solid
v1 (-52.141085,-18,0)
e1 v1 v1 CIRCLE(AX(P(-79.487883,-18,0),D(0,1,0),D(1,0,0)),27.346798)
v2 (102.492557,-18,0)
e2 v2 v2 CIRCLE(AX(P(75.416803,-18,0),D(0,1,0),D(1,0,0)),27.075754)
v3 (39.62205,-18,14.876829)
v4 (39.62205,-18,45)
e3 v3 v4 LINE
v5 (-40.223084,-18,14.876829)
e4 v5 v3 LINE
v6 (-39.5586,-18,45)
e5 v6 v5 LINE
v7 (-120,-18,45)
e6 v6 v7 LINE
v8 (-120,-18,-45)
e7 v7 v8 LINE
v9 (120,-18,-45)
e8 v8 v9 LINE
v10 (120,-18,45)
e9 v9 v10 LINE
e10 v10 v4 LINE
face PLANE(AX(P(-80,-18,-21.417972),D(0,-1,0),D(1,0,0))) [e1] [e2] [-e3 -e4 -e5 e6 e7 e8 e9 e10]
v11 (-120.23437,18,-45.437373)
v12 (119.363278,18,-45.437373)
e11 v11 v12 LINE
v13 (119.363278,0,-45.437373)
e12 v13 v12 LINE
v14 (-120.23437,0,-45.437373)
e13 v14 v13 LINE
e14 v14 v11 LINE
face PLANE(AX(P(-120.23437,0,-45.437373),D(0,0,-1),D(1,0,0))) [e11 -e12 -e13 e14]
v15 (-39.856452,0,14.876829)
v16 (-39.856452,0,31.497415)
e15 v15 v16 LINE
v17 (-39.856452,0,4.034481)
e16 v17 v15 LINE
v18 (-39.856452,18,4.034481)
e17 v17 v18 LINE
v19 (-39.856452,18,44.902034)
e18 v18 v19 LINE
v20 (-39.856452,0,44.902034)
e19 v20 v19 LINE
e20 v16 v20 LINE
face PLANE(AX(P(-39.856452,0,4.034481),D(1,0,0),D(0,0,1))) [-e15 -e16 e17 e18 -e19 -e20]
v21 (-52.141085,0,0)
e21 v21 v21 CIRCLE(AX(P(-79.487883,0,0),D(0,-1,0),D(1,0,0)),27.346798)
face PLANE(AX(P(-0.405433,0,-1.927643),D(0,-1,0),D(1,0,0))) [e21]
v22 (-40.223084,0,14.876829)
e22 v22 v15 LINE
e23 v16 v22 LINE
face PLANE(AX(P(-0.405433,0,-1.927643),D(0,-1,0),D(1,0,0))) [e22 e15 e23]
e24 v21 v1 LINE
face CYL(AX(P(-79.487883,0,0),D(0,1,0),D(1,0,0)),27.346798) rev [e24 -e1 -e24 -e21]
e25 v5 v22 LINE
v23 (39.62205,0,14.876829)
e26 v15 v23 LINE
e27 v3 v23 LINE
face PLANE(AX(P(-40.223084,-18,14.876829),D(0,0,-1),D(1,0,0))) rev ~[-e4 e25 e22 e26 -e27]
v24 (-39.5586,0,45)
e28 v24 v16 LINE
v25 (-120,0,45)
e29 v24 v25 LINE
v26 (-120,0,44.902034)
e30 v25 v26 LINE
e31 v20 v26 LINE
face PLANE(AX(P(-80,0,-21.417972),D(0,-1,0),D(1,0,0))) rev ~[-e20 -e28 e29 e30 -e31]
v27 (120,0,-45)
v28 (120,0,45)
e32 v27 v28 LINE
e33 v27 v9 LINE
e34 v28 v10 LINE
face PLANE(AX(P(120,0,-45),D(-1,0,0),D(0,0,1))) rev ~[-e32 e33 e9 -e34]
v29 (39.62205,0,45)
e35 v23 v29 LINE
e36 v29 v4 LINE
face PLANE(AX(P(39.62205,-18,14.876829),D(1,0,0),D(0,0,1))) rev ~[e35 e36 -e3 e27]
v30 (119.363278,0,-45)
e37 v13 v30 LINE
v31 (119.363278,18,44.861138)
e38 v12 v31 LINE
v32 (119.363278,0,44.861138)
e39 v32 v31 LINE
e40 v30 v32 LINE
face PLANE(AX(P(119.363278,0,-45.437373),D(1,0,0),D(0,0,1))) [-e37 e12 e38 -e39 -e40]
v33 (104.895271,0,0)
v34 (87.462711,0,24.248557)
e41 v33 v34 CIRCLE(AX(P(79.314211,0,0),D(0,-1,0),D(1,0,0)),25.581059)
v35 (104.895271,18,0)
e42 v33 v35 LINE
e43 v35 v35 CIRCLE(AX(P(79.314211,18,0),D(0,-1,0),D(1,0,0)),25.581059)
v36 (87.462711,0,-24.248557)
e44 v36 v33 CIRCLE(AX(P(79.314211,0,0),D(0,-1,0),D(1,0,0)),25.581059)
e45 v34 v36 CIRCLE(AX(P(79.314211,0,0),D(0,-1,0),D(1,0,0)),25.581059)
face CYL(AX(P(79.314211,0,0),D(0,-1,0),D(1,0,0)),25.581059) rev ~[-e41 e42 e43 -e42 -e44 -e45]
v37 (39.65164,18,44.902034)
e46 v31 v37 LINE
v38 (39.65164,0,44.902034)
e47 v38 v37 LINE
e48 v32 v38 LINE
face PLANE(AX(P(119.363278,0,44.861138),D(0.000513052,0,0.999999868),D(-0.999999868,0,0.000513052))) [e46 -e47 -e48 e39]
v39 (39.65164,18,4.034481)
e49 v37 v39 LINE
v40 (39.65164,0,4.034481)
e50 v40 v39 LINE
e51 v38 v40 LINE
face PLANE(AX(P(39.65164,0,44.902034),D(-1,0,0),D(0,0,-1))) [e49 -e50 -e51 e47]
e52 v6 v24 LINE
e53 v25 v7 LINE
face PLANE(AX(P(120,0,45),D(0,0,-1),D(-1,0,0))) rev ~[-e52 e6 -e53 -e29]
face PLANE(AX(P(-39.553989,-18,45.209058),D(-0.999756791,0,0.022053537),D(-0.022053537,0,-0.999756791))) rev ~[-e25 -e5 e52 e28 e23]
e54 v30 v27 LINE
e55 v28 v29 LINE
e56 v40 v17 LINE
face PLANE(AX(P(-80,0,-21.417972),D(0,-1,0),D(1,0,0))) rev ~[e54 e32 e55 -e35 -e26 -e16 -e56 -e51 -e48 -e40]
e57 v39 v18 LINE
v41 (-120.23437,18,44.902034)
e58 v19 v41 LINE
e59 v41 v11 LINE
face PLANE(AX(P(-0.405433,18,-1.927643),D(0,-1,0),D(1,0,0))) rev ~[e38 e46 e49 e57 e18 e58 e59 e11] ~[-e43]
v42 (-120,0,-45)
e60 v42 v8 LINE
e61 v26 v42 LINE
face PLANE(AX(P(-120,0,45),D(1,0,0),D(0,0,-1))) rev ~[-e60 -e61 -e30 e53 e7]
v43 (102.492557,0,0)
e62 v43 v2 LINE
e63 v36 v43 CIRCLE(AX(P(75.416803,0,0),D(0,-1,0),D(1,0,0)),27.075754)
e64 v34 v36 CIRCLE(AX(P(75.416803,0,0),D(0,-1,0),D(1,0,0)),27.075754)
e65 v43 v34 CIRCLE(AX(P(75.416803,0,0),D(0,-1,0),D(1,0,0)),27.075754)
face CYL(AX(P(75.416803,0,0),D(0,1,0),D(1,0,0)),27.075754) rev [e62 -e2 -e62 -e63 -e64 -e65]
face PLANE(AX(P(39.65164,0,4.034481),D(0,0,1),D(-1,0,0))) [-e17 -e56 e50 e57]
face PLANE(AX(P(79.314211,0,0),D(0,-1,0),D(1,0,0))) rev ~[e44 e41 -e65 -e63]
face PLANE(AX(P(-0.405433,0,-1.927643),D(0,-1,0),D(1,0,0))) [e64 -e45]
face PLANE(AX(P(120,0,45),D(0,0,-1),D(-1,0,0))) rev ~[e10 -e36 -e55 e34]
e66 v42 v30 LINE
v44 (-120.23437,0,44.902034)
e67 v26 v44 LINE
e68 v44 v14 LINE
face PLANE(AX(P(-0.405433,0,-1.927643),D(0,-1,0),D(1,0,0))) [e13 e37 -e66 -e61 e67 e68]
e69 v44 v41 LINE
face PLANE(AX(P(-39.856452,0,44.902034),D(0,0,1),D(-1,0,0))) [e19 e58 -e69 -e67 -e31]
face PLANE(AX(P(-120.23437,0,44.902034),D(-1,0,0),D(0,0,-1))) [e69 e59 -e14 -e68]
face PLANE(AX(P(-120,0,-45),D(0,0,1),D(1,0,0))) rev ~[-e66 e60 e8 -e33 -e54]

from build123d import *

# Parameters (mm, degrees)
F2_DEPTH  = 18
F0_W      = 80
F0_H      = 47.1640562918
F0_H_2    = 42.8359437082
F0_H_3    = 45
F4_DEPTH  = 25
F5_R      = 27.3467975621
F5_R_2    = 27.0757536819
F6_DEPTH  = 58.2
F8_DEPTH  = 18
F9_R      = 25.5810591855
F10_DEPTH = 63.8


# Not quite as in the source:
# - a feature names something its author has since deleted; it is built from what else it names


with BuildPart() as f2:
    # F1 (on face) → F2 (new body)
    with BuildSketch(Plane.XZ):
        Polygon((39.6220497787, 45.2090576291), (-39.5539887249, 45.2090576291), (-40.2230843902, 14.8768285289), (39.6220497787, 14.8768285289), align=None)
    extrude(amount=F2_DEPTH)


with BuildPart() as f2b:
    # F0 (on Front) → F2, piece 2 (new body)
    with BuildSketch(Plane.XZ):
        with Locations((-80, -21.4179718541)):
            Rectangle(F0_W, F0_H)
        Polygon((-40, 2.1640562918), (-40, -45), (40, -45), (40, 0), (40, 45), (-40, 45), align=None)
        with Locations((-80, 23.5820281459)):
            Rectangle(F0_W, F0_H_2)
        with Locations((80, -22.5)):
            Rectangle(F0_W, F0_H_3)
        with Locations((80, 22.5)):
            Rectangle(F0_W, F0_H_3)
    extrude(amount=F2_DEPTH)


with BuildPart() as f4_tool:
    # F3 (on face) → F4 (new body)
    with BuildSketch(Plane.XZ.offset(18)):
        Polygon((39.6220497787, 14.8768285289), (39.6220497787, 45.2090576291), (-39.5539887249, 45.2090576291), (-40.2230843902, 14.8768285289), align=None)
    extrude(amount=-F4_DEPTH)


with BuildPart() as f2_1:
    add(f2.part)

    # F4: cut by f4_tool
    add(f4_tool.part, mode=Mode.SUBTRACT)


with BuildPart() as f2b_1:
    add(f2b.part)

    # F4: cut by f4_tool
    add(f4_tool.part, mode=Mode.SUBTRACT)

    # F5 (on Front) → F6 (cut)
    with BuildSketch(Plane.XZ):
        with Locations((-79.4878825545, 0)):
            Circle(F5_R)
        with Locations((75.41680336, 0)):
            Circle(F5_R_2)
    extrude(amount=F6_DEPTH, mode=Mode.SUBTRACT)

    # F7 (on Front) → F8 (join)
    with BuildSketch(Plane.XZ):
        Polygon((119.3632781506, -45.4373732209), (119.3632781506, 44.861137867), (39.6516397595, 44.9020341039), (39.6516397595, 4.0344810113), (-39.8564524949, 4.0344810113), (-39.8564524949, 44.9020341039), (-120.2343702316, 44.9020341039), (-120.2343702316, -45.4373732209), align=None)
    extrude(amount=-F8_DEPTH)

    # F9 (on Front) → F10 (cut)
    with BuildSketch(Plane.XZ):
        with Locations((79.3142113835, 0)):
            Circle(F9_R)
    extrude(amount=-F10_DEPTH, mode=Mode.SUBTRACT)


solid = f2b_1.part
